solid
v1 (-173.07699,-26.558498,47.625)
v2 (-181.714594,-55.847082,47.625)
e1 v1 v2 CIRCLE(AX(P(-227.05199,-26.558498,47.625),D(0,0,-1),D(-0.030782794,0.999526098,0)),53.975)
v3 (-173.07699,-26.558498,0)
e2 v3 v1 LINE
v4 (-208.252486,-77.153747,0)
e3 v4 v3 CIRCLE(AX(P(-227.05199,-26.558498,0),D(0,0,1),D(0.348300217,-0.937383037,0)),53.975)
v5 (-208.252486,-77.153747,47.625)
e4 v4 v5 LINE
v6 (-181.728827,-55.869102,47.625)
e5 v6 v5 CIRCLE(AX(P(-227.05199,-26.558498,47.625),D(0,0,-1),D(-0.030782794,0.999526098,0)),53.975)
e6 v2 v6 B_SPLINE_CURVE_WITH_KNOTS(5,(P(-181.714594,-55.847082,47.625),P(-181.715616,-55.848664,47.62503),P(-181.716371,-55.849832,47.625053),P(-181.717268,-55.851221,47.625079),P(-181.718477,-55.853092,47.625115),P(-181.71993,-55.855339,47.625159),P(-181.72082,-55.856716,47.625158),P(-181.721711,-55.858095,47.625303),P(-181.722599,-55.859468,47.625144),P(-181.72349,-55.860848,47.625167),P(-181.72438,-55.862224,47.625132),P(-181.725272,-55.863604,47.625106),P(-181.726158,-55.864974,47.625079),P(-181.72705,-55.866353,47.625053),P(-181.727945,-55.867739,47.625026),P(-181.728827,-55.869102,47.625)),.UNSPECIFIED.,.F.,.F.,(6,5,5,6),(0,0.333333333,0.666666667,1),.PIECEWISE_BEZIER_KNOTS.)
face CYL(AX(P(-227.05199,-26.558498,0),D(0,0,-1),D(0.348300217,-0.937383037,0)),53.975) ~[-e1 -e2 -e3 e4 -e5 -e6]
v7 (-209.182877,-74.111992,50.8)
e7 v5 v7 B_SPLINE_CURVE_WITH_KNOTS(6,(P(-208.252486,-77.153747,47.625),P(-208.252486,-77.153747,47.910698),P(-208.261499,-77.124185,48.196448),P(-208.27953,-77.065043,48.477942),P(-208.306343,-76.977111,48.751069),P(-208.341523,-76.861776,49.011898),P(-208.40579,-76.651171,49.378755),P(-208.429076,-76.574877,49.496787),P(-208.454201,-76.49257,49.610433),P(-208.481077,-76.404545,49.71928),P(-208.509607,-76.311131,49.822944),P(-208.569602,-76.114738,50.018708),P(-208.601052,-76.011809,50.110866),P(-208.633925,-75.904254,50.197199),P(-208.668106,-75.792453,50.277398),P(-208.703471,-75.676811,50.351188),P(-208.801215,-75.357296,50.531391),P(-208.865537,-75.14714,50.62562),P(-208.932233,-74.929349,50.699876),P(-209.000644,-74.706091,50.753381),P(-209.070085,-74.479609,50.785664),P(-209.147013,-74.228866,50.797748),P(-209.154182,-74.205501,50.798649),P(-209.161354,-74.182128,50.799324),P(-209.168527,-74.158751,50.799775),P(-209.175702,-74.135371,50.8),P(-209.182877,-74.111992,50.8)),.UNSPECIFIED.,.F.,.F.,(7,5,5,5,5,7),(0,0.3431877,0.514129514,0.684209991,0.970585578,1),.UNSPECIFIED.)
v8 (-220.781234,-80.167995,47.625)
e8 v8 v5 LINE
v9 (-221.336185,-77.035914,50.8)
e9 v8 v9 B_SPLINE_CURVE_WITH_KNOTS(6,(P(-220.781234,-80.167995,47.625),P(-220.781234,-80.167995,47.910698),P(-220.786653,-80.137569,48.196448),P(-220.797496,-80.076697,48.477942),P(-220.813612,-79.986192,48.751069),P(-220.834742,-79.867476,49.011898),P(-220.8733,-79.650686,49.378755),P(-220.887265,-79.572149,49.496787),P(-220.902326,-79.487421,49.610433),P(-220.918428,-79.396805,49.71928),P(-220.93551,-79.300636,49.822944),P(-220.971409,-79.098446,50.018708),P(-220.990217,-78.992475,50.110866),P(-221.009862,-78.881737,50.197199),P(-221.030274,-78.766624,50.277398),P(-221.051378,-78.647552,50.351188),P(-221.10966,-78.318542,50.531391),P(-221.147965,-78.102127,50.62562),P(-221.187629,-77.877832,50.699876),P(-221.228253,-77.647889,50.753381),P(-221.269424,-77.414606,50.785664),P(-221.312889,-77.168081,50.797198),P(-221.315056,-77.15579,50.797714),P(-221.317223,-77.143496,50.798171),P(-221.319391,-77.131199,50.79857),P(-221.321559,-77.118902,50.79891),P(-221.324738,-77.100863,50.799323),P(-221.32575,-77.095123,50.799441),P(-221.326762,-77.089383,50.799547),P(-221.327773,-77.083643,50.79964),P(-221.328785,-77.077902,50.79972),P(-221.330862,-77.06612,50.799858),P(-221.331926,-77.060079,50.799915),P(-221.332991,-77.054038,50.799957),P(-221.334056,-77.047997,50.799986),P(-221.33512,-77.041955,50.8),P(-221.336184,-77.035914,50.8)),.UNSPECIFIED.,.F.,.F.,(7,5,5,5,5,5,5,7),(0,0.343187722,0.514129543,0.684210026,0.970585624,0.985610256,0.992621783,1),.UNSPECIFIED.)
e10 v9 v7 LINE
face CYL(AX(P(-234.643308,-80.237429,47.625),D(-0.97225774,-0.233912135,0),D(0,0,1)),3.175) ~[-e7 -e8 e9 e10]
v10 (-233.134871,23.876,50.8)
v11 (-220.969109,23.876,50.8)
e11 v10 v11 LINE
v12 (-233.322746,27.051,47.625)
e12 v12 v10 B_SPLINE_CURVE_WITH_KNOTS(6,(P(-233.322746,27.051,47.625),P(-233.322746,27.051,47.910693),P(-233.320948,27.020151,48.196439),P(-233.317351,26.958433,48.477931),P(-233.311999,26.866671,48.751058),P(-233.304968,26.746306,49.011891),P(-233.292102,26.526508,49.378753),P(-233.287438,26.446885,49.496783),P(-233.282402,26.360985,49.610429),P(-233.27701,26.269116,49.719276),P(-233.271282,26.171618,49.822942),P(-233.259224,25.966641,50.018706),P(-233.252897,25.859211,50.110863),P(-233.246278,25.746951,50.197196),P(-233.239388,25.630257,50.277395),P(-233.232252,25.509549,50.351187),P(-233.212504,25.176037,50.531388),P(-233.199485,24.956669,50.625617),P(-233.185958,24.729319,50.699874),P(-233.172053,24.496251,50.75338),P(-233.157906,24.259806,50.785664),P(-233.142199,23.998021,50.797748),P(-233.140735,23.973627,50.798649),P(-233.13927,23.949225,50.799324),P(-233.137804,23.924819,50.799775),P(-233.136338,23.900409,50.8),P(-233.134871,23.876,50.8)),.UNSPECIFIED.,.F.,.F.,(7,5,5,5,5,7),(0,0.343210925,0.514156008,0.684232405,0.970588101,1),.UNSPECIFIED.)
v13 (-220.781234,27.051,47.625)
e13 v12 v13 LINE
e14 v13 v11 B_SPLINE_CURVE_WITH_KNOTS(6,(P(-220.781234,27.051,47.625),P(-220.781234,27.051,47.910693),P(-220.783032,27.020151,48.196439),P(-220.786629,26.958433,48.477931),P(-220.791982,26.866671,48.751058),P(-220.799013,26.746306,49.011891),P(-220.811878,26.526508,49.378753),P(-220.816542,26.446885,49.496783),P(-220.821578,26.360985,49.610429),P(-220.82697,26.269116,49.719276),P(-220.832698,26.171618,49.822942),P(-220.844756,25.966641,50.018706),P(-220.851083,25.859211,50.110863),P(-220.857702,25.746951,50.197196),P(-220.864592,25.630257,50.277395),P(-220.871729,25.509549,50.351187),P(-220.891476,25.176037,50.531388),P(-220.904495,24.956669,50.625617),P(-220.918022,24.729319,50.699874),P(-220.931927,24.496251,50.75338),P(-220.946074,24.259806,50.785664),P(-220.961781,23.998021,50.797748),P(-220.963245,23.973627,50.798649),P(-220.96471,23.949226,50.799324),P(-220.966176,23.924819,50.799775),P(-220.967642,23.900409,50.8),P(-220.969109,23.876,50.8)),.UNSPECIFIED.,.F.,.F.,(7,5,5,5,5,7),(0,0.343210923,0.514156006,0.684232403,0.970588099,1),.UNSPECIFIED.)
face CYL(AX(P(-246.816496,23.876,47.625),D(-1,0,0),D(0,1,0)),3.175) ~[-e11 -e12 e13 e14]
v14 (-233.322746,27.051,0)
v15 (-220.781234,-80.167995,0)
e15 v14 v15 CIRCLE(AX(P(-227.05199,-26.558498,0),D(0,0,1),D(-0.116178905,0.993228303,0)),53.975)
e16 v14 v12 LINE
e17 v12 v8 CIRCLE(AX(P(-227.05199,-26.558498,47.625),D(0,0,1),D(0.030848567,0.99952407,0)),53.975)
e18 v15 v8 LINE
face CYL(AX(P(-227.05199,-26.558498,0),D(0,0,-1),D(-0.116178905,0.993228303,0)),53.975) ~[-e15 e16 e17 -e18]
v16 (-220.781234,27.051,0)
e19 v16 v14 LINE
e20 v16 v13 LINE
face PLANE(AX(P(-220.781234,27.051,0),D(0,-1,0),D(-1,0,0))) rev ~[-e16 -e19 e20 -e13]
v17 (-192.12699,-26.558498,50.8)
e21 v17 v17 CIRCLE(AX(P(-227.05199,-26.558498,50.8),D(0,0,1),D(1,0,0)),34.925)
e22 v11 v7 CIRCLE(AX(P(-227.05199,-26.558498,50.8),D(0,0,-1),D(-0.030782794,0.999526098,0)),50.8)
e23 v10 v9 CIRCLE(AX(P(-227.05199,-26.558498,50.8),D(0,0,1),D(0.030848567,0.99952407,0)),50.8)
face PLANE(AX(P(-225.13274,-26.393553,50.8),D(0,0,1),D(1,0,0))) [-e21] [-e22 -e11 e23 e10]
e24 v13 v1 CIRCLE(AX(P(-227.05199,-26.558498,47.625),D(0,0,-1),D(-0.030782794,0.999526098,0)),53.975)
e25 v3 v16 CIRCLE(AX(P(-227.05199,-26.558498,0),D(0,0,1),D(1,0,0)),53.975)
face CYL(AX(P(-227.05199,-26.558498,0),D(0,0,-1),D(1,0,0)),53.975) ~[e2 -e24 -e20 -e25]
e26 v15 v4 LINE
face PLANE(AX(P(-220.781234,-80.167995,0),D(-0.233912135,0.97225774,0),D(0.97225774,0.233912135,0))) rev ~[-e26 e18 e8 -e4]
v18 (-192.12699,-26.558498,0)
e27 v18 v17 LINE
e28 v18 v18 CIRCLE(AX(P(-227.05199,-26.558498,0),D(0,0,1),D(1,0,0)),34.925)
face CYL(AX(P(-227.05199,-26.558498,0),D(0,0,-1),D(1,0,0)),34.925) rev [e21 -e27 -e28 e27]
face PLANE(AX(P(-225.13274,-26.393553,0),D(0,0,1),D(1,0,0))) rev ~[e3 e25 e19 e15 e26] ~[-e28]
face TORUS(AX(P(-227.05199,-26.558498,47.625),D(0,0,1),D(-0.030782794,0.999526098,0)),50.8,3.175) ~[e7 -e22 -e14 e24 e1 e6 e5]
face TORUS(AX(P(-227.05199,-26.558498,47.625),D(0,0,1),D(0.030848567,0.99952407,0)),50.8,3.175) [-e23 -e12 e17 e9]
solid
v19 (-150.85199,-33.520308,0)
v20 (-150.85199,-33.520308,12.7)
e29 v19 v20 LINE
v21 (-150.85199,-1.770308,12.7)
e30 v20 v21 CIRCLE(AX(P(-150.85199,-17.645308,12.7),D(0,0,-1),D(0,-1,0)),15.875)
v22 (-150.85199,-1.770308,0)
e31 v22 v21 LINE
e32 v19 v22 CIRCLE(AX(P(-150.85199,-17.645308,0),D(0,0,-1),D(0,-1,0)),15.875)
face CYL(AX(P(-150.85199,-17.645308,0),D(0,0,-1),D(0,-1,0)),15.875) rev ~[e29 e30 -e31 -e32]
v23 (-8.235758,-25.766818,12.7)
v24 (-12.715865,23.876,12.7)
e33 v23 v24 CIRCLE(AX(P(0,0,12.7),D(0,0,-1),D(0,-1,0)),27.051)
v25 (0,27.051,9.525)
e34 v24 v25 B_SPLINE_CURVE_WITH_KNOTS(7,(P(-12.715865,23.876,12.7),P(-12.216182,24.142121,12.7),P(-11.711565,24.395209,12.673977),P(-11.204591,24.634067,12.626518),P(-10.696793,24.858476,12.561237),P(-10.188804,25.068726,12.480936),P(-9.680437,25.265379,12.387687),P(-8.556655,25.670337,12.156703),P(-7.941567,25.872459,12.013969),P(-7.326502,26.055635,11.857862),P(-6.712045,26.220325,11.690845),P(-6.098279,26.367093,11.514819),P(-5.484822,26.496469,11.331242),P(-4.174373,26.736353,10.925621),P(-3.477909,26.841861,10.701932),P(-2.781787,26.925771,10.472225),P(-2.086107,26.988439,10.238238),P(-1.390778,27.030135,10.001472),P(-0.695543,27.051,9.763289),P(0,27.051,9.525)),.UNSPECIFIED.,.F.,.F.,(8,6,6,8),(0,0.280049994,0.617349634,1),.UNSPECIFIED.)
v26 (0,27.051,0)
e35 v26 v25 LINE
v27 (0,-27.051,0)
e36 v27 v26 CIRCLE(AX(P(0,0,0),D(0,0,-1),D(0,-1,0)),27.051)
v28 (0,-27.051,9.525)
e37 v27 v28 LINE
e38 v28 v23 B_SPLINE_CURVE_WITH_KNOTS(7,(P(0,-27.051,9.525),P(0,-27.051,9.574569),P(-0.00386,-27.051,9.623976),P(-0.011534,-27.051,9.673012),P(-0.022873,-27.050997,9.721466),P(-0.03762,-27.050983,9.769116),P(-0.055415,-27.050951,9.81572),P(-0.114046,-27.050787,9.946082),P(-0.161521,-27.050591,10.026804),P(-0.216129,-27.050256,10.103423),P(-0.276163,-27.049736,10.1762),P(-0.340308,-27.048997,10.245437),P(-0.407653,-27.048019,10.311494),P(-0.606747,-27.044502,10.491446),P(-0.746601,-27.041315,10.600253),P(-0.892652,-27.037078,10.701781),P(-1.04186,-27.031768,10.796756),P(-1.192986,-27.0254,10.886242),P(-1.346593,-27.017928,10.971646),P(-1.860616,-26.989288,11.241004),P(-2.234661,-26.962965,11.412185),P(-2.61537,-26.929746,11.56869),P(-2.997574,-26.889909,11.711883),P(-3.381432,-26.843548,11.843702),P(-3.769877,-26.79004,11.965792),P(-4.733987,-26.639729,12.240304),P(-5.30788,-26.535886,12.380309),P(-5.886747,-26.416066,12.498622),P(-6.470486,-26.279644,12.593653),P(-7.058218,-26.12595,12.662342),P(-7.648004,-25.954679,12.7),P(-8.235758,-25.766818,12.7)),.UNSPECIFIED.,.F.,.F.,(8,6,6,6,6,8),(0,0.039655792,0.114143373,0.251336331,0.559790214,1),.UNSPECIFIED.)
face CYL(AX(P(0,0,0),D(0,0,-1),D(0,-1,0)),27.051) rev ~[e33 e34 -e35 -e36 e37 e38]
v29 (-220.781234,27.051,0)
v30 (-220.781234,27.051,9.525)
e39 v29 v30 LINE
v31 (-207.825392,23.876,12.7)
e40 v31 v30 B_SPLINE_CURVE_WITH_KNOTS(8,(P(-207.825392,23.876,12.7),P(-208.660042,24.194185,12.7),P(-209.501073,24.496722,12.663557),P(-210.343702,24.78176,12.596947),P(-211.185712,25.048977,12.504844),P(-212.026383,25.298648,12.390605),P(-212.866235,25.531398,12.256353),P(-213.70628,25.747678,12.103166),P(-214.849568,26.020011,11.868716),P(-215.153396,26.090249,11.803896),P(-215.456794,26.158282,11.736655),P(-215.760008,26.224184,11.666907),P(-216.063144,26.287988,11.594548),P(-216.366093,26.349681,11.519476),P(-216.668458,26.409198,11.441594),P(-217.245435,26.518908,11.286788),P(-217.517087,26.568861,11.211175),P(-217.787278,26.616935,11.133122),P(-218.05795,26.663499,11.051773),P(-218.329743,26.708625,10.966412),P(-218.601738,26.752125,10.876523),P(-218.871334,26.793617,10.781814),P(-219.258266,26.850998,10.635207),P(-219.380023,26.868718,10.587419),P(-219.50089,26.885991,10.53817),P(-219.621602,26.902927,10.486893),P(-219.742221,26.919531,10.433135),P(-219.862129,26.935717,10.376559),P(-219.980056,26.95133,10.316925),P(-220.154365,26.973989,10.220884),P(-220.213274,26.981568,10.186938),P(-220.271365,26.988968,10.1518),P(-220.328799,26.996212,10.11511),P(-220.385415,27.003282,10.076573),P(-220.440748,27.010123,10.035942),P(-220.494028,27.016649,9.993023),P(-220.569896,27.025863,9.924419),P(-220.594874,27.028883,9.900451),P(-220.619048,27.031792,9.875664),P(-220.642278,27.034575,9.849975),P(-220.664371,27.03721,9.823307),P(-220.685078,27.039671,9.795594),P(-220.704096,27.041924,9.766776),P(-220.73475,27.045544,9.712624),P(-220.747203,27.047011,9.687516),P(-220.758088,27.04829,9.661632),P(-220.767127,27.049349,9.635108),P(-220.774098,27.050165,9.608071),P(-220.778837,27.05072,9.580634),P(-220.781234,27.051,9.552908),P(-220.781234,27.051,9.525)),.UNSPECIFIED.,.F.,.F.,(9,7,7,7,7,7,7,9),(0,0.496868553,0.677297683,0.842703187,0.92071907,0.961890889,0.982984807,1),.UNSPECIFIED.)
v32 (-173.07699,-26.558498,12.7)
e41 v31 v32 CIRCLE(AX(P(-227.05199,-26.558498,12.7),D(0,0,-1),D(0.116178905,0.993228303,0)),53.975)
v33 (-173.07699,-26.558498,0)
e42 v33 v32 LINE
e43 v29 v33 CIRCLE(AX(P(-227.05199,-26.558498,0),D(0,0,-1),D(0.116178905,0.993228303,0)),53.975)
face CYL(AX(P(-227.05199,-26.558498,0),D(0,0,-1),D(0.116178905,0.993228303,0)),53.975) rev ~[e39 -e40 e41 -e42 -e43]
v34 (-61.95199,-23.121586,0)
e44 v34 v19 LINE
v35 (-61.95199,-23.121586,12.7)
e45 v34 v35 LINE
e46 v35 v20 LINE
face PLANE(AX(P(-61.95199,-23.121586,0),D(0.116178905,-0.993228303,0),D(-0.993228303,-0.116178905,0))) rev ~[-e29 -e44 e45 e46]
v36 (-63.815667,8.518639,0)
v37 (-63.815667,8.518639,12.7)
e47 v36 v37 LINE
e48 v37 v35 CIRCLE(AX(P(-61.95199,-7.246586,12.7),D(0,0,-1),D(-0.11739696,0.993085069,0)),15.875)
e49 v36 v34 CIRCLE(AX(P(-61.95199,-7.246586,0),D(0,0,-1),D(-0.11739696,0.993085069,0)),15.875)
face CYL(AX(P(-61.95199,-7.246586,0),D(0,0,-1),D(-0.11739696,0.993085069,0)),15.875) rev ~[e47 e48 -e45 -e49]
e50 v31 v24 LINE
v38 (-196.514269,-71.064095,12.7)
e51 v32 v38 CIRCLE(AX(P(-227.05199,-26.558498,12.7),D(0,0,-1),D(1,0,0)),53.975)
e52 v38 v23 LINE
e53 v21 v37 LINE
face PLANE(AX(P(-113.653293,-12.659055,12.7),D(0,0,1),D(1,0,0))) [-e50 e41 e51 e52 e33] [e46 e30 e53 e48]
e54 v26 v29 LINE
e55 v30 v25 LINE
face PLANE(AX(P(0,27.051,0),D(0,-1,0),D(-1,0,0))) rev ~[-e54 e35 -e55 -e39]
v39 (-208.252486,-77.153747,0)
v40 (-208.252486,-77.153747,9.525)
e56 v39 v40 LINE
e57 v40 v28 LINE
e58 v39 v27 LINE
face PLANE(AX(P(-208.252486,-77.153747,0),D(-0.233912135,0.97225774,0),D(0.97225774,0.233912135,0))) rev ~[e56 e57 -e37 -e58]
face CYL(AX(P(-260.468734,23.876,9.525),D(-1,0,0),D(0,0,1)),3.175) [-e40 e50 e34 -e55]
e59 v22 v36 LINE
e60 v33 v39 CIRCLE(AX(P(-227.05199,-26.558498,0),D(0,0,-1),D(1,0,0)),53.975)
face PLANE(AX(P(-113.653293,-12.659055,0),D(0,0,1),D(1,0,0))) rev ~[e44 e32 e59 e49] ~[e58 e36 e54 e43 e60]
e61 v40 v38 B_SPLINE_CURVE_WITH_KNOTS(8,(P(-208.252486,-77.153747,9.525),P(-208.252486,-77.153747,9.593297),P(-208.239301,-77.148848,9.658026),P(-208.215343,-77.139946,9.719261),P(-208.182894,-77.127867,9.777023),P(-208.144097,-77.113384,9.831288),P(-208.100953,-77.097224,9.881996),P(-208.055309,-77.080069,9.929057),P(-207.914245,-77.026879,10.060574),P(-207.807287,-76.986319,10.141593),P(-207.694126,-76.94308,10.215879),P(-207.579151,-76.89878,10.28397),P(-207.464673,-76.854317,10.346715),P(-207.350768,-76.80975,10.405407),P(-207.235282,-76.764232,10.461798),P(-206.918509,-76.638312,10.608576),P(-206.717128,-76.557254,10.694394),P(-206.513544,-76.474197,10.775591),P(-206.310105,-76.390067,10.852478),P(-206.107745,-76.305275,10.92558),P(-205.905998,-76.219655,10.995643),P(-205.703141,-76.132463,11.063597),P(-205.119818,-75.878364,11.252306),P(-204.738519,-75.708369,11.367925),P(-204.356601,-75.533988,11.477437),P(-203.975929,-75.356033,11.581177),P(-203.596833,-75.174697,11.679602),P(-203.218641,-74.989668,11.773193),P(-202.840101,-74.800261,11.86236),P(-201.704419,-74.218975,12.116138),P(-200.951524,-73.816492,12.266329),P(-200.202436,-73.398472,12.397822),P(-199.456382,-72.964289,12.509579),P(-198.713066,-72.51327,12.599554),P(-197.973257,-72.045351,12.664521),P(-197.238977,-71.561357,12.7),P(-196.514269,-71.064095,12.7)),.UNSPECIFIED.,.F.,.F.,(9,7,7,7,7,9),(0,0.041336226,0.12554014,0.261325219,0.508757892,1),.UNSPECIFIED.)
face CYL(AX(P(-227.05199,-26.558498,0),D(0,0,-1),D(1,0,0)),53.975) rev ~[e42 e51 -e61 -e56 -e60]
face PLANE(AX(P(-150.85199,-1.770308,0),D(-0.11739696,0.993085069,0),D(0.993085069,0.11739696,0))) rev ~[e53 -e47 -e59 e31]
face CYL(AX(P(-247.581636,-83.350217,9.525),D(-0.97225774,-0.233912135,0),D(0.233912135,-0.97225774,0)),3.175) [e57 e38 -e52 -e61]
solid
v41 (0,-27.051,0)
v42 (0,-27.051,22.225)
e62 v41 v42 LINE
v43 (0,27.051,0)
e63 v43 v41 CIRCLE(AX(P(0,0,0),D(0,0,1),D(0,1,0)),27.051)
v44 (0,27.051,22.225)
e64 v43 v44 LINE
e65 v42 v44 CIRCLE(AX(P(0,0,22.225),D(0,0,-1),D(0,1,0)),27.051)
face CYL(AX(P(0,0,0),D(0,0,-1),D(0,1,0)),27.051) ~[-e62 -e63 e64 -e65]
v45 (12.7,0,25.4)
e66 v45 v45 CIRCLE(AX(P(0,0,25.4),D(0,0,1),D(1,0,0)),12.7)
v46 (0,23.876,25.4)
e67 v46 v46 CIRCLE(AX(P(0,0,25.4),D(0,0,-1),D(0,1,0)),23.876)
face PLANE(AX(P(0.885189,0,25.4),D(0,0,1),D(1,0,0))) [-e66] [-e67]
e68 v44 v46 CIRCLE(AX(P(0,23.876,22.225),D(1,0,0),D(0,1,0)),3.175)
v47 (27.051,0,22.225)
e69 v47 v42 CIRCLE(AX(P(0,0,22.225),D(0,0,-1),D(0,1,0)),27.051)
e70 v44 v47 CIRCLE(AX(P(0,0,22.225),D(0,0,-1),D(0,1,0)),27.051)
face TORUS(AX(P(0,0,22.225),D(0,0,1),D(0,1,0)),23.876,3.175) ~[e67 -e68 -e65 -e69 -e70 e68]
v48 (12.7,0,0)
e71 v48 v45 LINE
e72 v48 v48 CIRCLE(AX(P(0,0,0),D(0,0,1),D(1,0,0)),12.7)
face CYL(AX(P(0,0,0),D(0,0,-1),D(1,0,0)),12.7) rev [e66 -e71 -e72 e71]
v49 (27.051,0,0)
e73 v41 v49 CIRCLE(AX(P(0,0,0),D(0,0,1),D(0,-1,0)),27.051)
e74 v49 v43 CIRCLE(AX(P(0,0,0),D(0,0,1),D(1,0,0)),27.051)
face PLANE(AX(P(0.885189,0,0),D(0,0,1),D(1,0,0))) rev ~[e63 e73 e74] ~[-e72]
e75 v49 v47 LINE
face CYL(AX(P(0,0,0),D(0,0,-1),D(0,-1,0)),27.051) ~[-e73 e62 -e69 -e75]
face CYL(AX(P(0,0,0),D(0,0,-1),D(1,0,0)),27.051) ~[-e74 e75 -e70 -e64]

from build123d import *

# Parameters (mm, degrees)
F0_R          = 34.925
F1_DEPTH      = 50.8
F0_R_2        = 12.7
F2_DEPTH      = 25.4
F3_DEPTH      = 12.7
F4_T1_DEPTH   = 39.8737412721
F4_T3_DEPTH   = 39.5290127835
F4_T6_ANGLE   = 196.8788005765
F4_T8_ANGLE   = 169.8162488072
F4_3_T1_DEPTH = 273.9624836944
F4_3_T3_DEPTH = 277.6947318263


# Not quite as in the source:
# - a fillet or chamfer that OpenCascade refuses, or shapes differently, is made with other operations: its cross-section is extruded or revolved along the edge and cut away or added


with BuildPart() as f1:
    # F0 (on Top) → F1 (new body)
    with BuildSketch(Plane.XY):
        with BuildLine():
            ThreePointArc((-173.0769900862, -26.5584976592), (-186.7297586174, 9.3221137399), (-220.7812336944, 27.051))
            Line((-220.7812336944, 27.051), (-233.3227464779, 27.051))
            ThreePointArc((-233.3227464779, 27.051), (-280.6614877454, -32.829254051), (-220.7812336944, -80.1679953185))
            Line((-220.7812336944, -80.1679953185), (-208.2524858785, -77.1537471057))
            ThreePointArc((-208.2524858785, -77.1537471057), (-182.7349286729, -57.3691888669), (-173.0769900862, -26.5584976592))
        make_face()
        with Locations((-227.0519900862, -26.5584976592)):
            Circle(F0_R, mode=Mode.SUBTRACT)
    extrude(amount=F1_DEPTH)

    # F4: fillet of radius 3.175 on 4 edges, made by hand

    # F4_s2 → F4_t1 (cut)
    with BuildSketch(Plane(origin=(-240.0526530104, -57.7534396052, 0), x_dir=(0, 0, 1), z_dir=(0.97225774, 0.2339121354, 0))):
        with BuildLine():
            ThreePointArc((50.8, 23.1255441239), (49.8700640303, 25.3706081542), (47.625, 26.3005441239))
            Line((47.625, 26.3005441239), (50.8, 26.3005441239))
            Line((50.8, 26.3005441239), (50.8, 23.1255441239))
        make_face()
    extrude(amount=F4_T1_DEPTH, mode=Mode.SUBTRACT)

    # F4_s4 → F4_t3 (cut)
    with BuildSketch(Plane.YZ.offset(-246.8164964779)):
        with BuildLine():
            ThreePointArc((27.051, 47.625), (26.1210640303, 49.8700640303), (23.876, 50.8))
            Line((23.876, 50.8), (27.051, 50.8))
            Line((27.051, 50.8), (27.051, 47.625))
        make_face()
    extrude(amount=F4_T3_DEPTH, mode=Mode.SUBTRACT)

    # F4_s5 → F4_t6 (revolve, cut)
    with BuildSketch(Plane(origin=(-226.0170180044, 6.9756210319, 0), x_dir=(0, 0, 1), z_dir=(0.9995240697, -0.030848567, 0))):
        with BuildLine():
            ThreePointArc((47.625, -20.4249138064), (49.8700640303, -19.4949778367), (50.8, -17.2499138064))
            Line((50.8, -17.2499138064), (50.8, -20.4249138064))
            Line((50.8, -20.4249138064), (47.625, -20.4249138064))
        make_face()
    revolve(axis=Axis((-227.0519900862, -26.5584976592, 50.8), (0, 0, 1)), revolution_arc=F4_T6_ANGLE, mode=Mode.SUBTRACT)

    # F4_s7 → F4_t8 (revolve, cut)
    with BuildSketch(Plane(origin=(-227.653997391, -7.0111486331, 0), x_dir=(0, 0, 1), z_dir=(-0.9995260975, -0.0307827937, 0))):
        with BuildLine():
            ThreePointArc((47.625, 34.4183830445), (49.8700640303, 33.4884470747), (50.8, 31.2433830445))
            Line((50.8, 31.2433830445), (50.8, 34.4183830445))
            Line((50.8, 34.4183830445), (47.625, 34.4183830445))
        make_face()
    revolve(axis=Axis((-227.0519900862, -26.5584976592, 50.8), (0, 0, -1)), revolution_arc=F4_T8_ANGLE, mode=Mode.SUBTRACT)


with BuildPart() as f2:
    # F0 (on Top) → F2 (new body)
    with BuildSketch(Plane.XY):
        with BuildLine():
            ThreePointArc((0, -27.051), (19.1279455379, -19.1279455379), (27.051, 0))
            ThreePointArc((27.051, 0), (19.1279455379, 19.1279455379), (0, 27.051))
            ThreePointArc((0, 27.051), (-27.051, 0), (0, -27.051))
        make_face()
        Circle(F0_R_2, mode=Mode.SUBTRACT)
    extrude(amount=F2_DEPTH)

    # F4#2: fillet of radius 3.175 on 1 edges, made by hand

    # F4_2_s1 → F4_2_t2 (revolve, cut)
    with BuildSketch(Plane.YZ):
        with BuildLine():
            ThreePointArc((27.051, 22.225), (26.1210640303, 24.4700640303), (23.876, 25.4))
            Line((23.876, 25.4), (27.051, 25.4))
            Line((27.051, 25.4), (27.051, 22.225))
        make_face()
    revolve(axis=Axis((0, 0, 25.4), (0, 0, -1)), mode=Mode.SUBTRACT)


with BuildPart() as f3:
    # F0 (on Top) → F3 (new body)
    with BuildSketch(Plane.XY):
        with BuildLine():
            ThreePointArc((0, -27.051), (-27.051, 0), (0, 27.051))
            Line((0, 27.051), (-220.7812336944, 27.051))
            ThreePointArc((-220.7812336944, 27.051), (-186.7297586174, 9.3221137399), (-173.0769900862, -26.5584976592))
            ThreePointArc((-173.0769900862, -26.5584976592), (-182.7349286729, -57.3691888669), (-208.2524858785, -77.1537471057))
            Line((-208.2524858785, -77.1537471057), (0, -27.051))
        make_face()
        with BuildLine():
            ThreePointArc((-150.8519900862, -33.5203076851), (-166.7269900862, -17.6453076851), (-150.8519900862, -1.7703076851))
            Line((-150.8519900862, -1.7703076851), (-63.8156668227, 8.5186394182))
            ThreePointArc((-63.8156668227, 8.5186394182), (-46.1044574819, -6.3131325916), (-61.9519900862, -23.1215860487))
            Line((-61.9519900862, -23.1215860487), (-150.8519900862, -33.5203076851))
        make_face(mode=Mode.SUBTRACT)
    extrude(amount=F3_DEPTH)

    # F4#3: fillet of radius 3.175 on 2 edges, made by hand

    # F4_3_s2 → F4_3_t1 (cut)
    with BuildSketch(Plane.YZ.offset(-260.4687336944)):
        with BuildLine():
            ThreePointArc((23.876, 12.7), (26.1210640303, 11.7700640303), (27.051, 9.525))
            Line((27.051, 9.525), (27.051, 12.7))
            Line((27.051, 12.7), (23.876, 12.7))
        make_face()
    extrude(amount=F4_3_T1_DEPTH, mode=Mode.SUBTRACT)

    # F4_3_s4 → F4_3_t3 (cut)
    with BuildSketch(Plane(origin=(-252.9909813708, -60.8662273882, 0), x_dir=(0, 0, 1), z_dir=(0.97225774, 0.2339121354, 0))):
        with BuildLine():
            ThreePointArc((9.525, 26.3005441239), (11.7700640303, 25.3706081542), (12.7, 23.1255441239))
            Line((12.7, 23.1255441239), (12.7, 26.3005441239))
            Line((12.7, 26.3005441239), (9.525, 26.3005441239))
        make_face()
    extrude(amount=F4_3_T3_DEPTH, mode=Mode.SUBTRACT)


solid = Compound([f1.part, f2.part, f3.part])
